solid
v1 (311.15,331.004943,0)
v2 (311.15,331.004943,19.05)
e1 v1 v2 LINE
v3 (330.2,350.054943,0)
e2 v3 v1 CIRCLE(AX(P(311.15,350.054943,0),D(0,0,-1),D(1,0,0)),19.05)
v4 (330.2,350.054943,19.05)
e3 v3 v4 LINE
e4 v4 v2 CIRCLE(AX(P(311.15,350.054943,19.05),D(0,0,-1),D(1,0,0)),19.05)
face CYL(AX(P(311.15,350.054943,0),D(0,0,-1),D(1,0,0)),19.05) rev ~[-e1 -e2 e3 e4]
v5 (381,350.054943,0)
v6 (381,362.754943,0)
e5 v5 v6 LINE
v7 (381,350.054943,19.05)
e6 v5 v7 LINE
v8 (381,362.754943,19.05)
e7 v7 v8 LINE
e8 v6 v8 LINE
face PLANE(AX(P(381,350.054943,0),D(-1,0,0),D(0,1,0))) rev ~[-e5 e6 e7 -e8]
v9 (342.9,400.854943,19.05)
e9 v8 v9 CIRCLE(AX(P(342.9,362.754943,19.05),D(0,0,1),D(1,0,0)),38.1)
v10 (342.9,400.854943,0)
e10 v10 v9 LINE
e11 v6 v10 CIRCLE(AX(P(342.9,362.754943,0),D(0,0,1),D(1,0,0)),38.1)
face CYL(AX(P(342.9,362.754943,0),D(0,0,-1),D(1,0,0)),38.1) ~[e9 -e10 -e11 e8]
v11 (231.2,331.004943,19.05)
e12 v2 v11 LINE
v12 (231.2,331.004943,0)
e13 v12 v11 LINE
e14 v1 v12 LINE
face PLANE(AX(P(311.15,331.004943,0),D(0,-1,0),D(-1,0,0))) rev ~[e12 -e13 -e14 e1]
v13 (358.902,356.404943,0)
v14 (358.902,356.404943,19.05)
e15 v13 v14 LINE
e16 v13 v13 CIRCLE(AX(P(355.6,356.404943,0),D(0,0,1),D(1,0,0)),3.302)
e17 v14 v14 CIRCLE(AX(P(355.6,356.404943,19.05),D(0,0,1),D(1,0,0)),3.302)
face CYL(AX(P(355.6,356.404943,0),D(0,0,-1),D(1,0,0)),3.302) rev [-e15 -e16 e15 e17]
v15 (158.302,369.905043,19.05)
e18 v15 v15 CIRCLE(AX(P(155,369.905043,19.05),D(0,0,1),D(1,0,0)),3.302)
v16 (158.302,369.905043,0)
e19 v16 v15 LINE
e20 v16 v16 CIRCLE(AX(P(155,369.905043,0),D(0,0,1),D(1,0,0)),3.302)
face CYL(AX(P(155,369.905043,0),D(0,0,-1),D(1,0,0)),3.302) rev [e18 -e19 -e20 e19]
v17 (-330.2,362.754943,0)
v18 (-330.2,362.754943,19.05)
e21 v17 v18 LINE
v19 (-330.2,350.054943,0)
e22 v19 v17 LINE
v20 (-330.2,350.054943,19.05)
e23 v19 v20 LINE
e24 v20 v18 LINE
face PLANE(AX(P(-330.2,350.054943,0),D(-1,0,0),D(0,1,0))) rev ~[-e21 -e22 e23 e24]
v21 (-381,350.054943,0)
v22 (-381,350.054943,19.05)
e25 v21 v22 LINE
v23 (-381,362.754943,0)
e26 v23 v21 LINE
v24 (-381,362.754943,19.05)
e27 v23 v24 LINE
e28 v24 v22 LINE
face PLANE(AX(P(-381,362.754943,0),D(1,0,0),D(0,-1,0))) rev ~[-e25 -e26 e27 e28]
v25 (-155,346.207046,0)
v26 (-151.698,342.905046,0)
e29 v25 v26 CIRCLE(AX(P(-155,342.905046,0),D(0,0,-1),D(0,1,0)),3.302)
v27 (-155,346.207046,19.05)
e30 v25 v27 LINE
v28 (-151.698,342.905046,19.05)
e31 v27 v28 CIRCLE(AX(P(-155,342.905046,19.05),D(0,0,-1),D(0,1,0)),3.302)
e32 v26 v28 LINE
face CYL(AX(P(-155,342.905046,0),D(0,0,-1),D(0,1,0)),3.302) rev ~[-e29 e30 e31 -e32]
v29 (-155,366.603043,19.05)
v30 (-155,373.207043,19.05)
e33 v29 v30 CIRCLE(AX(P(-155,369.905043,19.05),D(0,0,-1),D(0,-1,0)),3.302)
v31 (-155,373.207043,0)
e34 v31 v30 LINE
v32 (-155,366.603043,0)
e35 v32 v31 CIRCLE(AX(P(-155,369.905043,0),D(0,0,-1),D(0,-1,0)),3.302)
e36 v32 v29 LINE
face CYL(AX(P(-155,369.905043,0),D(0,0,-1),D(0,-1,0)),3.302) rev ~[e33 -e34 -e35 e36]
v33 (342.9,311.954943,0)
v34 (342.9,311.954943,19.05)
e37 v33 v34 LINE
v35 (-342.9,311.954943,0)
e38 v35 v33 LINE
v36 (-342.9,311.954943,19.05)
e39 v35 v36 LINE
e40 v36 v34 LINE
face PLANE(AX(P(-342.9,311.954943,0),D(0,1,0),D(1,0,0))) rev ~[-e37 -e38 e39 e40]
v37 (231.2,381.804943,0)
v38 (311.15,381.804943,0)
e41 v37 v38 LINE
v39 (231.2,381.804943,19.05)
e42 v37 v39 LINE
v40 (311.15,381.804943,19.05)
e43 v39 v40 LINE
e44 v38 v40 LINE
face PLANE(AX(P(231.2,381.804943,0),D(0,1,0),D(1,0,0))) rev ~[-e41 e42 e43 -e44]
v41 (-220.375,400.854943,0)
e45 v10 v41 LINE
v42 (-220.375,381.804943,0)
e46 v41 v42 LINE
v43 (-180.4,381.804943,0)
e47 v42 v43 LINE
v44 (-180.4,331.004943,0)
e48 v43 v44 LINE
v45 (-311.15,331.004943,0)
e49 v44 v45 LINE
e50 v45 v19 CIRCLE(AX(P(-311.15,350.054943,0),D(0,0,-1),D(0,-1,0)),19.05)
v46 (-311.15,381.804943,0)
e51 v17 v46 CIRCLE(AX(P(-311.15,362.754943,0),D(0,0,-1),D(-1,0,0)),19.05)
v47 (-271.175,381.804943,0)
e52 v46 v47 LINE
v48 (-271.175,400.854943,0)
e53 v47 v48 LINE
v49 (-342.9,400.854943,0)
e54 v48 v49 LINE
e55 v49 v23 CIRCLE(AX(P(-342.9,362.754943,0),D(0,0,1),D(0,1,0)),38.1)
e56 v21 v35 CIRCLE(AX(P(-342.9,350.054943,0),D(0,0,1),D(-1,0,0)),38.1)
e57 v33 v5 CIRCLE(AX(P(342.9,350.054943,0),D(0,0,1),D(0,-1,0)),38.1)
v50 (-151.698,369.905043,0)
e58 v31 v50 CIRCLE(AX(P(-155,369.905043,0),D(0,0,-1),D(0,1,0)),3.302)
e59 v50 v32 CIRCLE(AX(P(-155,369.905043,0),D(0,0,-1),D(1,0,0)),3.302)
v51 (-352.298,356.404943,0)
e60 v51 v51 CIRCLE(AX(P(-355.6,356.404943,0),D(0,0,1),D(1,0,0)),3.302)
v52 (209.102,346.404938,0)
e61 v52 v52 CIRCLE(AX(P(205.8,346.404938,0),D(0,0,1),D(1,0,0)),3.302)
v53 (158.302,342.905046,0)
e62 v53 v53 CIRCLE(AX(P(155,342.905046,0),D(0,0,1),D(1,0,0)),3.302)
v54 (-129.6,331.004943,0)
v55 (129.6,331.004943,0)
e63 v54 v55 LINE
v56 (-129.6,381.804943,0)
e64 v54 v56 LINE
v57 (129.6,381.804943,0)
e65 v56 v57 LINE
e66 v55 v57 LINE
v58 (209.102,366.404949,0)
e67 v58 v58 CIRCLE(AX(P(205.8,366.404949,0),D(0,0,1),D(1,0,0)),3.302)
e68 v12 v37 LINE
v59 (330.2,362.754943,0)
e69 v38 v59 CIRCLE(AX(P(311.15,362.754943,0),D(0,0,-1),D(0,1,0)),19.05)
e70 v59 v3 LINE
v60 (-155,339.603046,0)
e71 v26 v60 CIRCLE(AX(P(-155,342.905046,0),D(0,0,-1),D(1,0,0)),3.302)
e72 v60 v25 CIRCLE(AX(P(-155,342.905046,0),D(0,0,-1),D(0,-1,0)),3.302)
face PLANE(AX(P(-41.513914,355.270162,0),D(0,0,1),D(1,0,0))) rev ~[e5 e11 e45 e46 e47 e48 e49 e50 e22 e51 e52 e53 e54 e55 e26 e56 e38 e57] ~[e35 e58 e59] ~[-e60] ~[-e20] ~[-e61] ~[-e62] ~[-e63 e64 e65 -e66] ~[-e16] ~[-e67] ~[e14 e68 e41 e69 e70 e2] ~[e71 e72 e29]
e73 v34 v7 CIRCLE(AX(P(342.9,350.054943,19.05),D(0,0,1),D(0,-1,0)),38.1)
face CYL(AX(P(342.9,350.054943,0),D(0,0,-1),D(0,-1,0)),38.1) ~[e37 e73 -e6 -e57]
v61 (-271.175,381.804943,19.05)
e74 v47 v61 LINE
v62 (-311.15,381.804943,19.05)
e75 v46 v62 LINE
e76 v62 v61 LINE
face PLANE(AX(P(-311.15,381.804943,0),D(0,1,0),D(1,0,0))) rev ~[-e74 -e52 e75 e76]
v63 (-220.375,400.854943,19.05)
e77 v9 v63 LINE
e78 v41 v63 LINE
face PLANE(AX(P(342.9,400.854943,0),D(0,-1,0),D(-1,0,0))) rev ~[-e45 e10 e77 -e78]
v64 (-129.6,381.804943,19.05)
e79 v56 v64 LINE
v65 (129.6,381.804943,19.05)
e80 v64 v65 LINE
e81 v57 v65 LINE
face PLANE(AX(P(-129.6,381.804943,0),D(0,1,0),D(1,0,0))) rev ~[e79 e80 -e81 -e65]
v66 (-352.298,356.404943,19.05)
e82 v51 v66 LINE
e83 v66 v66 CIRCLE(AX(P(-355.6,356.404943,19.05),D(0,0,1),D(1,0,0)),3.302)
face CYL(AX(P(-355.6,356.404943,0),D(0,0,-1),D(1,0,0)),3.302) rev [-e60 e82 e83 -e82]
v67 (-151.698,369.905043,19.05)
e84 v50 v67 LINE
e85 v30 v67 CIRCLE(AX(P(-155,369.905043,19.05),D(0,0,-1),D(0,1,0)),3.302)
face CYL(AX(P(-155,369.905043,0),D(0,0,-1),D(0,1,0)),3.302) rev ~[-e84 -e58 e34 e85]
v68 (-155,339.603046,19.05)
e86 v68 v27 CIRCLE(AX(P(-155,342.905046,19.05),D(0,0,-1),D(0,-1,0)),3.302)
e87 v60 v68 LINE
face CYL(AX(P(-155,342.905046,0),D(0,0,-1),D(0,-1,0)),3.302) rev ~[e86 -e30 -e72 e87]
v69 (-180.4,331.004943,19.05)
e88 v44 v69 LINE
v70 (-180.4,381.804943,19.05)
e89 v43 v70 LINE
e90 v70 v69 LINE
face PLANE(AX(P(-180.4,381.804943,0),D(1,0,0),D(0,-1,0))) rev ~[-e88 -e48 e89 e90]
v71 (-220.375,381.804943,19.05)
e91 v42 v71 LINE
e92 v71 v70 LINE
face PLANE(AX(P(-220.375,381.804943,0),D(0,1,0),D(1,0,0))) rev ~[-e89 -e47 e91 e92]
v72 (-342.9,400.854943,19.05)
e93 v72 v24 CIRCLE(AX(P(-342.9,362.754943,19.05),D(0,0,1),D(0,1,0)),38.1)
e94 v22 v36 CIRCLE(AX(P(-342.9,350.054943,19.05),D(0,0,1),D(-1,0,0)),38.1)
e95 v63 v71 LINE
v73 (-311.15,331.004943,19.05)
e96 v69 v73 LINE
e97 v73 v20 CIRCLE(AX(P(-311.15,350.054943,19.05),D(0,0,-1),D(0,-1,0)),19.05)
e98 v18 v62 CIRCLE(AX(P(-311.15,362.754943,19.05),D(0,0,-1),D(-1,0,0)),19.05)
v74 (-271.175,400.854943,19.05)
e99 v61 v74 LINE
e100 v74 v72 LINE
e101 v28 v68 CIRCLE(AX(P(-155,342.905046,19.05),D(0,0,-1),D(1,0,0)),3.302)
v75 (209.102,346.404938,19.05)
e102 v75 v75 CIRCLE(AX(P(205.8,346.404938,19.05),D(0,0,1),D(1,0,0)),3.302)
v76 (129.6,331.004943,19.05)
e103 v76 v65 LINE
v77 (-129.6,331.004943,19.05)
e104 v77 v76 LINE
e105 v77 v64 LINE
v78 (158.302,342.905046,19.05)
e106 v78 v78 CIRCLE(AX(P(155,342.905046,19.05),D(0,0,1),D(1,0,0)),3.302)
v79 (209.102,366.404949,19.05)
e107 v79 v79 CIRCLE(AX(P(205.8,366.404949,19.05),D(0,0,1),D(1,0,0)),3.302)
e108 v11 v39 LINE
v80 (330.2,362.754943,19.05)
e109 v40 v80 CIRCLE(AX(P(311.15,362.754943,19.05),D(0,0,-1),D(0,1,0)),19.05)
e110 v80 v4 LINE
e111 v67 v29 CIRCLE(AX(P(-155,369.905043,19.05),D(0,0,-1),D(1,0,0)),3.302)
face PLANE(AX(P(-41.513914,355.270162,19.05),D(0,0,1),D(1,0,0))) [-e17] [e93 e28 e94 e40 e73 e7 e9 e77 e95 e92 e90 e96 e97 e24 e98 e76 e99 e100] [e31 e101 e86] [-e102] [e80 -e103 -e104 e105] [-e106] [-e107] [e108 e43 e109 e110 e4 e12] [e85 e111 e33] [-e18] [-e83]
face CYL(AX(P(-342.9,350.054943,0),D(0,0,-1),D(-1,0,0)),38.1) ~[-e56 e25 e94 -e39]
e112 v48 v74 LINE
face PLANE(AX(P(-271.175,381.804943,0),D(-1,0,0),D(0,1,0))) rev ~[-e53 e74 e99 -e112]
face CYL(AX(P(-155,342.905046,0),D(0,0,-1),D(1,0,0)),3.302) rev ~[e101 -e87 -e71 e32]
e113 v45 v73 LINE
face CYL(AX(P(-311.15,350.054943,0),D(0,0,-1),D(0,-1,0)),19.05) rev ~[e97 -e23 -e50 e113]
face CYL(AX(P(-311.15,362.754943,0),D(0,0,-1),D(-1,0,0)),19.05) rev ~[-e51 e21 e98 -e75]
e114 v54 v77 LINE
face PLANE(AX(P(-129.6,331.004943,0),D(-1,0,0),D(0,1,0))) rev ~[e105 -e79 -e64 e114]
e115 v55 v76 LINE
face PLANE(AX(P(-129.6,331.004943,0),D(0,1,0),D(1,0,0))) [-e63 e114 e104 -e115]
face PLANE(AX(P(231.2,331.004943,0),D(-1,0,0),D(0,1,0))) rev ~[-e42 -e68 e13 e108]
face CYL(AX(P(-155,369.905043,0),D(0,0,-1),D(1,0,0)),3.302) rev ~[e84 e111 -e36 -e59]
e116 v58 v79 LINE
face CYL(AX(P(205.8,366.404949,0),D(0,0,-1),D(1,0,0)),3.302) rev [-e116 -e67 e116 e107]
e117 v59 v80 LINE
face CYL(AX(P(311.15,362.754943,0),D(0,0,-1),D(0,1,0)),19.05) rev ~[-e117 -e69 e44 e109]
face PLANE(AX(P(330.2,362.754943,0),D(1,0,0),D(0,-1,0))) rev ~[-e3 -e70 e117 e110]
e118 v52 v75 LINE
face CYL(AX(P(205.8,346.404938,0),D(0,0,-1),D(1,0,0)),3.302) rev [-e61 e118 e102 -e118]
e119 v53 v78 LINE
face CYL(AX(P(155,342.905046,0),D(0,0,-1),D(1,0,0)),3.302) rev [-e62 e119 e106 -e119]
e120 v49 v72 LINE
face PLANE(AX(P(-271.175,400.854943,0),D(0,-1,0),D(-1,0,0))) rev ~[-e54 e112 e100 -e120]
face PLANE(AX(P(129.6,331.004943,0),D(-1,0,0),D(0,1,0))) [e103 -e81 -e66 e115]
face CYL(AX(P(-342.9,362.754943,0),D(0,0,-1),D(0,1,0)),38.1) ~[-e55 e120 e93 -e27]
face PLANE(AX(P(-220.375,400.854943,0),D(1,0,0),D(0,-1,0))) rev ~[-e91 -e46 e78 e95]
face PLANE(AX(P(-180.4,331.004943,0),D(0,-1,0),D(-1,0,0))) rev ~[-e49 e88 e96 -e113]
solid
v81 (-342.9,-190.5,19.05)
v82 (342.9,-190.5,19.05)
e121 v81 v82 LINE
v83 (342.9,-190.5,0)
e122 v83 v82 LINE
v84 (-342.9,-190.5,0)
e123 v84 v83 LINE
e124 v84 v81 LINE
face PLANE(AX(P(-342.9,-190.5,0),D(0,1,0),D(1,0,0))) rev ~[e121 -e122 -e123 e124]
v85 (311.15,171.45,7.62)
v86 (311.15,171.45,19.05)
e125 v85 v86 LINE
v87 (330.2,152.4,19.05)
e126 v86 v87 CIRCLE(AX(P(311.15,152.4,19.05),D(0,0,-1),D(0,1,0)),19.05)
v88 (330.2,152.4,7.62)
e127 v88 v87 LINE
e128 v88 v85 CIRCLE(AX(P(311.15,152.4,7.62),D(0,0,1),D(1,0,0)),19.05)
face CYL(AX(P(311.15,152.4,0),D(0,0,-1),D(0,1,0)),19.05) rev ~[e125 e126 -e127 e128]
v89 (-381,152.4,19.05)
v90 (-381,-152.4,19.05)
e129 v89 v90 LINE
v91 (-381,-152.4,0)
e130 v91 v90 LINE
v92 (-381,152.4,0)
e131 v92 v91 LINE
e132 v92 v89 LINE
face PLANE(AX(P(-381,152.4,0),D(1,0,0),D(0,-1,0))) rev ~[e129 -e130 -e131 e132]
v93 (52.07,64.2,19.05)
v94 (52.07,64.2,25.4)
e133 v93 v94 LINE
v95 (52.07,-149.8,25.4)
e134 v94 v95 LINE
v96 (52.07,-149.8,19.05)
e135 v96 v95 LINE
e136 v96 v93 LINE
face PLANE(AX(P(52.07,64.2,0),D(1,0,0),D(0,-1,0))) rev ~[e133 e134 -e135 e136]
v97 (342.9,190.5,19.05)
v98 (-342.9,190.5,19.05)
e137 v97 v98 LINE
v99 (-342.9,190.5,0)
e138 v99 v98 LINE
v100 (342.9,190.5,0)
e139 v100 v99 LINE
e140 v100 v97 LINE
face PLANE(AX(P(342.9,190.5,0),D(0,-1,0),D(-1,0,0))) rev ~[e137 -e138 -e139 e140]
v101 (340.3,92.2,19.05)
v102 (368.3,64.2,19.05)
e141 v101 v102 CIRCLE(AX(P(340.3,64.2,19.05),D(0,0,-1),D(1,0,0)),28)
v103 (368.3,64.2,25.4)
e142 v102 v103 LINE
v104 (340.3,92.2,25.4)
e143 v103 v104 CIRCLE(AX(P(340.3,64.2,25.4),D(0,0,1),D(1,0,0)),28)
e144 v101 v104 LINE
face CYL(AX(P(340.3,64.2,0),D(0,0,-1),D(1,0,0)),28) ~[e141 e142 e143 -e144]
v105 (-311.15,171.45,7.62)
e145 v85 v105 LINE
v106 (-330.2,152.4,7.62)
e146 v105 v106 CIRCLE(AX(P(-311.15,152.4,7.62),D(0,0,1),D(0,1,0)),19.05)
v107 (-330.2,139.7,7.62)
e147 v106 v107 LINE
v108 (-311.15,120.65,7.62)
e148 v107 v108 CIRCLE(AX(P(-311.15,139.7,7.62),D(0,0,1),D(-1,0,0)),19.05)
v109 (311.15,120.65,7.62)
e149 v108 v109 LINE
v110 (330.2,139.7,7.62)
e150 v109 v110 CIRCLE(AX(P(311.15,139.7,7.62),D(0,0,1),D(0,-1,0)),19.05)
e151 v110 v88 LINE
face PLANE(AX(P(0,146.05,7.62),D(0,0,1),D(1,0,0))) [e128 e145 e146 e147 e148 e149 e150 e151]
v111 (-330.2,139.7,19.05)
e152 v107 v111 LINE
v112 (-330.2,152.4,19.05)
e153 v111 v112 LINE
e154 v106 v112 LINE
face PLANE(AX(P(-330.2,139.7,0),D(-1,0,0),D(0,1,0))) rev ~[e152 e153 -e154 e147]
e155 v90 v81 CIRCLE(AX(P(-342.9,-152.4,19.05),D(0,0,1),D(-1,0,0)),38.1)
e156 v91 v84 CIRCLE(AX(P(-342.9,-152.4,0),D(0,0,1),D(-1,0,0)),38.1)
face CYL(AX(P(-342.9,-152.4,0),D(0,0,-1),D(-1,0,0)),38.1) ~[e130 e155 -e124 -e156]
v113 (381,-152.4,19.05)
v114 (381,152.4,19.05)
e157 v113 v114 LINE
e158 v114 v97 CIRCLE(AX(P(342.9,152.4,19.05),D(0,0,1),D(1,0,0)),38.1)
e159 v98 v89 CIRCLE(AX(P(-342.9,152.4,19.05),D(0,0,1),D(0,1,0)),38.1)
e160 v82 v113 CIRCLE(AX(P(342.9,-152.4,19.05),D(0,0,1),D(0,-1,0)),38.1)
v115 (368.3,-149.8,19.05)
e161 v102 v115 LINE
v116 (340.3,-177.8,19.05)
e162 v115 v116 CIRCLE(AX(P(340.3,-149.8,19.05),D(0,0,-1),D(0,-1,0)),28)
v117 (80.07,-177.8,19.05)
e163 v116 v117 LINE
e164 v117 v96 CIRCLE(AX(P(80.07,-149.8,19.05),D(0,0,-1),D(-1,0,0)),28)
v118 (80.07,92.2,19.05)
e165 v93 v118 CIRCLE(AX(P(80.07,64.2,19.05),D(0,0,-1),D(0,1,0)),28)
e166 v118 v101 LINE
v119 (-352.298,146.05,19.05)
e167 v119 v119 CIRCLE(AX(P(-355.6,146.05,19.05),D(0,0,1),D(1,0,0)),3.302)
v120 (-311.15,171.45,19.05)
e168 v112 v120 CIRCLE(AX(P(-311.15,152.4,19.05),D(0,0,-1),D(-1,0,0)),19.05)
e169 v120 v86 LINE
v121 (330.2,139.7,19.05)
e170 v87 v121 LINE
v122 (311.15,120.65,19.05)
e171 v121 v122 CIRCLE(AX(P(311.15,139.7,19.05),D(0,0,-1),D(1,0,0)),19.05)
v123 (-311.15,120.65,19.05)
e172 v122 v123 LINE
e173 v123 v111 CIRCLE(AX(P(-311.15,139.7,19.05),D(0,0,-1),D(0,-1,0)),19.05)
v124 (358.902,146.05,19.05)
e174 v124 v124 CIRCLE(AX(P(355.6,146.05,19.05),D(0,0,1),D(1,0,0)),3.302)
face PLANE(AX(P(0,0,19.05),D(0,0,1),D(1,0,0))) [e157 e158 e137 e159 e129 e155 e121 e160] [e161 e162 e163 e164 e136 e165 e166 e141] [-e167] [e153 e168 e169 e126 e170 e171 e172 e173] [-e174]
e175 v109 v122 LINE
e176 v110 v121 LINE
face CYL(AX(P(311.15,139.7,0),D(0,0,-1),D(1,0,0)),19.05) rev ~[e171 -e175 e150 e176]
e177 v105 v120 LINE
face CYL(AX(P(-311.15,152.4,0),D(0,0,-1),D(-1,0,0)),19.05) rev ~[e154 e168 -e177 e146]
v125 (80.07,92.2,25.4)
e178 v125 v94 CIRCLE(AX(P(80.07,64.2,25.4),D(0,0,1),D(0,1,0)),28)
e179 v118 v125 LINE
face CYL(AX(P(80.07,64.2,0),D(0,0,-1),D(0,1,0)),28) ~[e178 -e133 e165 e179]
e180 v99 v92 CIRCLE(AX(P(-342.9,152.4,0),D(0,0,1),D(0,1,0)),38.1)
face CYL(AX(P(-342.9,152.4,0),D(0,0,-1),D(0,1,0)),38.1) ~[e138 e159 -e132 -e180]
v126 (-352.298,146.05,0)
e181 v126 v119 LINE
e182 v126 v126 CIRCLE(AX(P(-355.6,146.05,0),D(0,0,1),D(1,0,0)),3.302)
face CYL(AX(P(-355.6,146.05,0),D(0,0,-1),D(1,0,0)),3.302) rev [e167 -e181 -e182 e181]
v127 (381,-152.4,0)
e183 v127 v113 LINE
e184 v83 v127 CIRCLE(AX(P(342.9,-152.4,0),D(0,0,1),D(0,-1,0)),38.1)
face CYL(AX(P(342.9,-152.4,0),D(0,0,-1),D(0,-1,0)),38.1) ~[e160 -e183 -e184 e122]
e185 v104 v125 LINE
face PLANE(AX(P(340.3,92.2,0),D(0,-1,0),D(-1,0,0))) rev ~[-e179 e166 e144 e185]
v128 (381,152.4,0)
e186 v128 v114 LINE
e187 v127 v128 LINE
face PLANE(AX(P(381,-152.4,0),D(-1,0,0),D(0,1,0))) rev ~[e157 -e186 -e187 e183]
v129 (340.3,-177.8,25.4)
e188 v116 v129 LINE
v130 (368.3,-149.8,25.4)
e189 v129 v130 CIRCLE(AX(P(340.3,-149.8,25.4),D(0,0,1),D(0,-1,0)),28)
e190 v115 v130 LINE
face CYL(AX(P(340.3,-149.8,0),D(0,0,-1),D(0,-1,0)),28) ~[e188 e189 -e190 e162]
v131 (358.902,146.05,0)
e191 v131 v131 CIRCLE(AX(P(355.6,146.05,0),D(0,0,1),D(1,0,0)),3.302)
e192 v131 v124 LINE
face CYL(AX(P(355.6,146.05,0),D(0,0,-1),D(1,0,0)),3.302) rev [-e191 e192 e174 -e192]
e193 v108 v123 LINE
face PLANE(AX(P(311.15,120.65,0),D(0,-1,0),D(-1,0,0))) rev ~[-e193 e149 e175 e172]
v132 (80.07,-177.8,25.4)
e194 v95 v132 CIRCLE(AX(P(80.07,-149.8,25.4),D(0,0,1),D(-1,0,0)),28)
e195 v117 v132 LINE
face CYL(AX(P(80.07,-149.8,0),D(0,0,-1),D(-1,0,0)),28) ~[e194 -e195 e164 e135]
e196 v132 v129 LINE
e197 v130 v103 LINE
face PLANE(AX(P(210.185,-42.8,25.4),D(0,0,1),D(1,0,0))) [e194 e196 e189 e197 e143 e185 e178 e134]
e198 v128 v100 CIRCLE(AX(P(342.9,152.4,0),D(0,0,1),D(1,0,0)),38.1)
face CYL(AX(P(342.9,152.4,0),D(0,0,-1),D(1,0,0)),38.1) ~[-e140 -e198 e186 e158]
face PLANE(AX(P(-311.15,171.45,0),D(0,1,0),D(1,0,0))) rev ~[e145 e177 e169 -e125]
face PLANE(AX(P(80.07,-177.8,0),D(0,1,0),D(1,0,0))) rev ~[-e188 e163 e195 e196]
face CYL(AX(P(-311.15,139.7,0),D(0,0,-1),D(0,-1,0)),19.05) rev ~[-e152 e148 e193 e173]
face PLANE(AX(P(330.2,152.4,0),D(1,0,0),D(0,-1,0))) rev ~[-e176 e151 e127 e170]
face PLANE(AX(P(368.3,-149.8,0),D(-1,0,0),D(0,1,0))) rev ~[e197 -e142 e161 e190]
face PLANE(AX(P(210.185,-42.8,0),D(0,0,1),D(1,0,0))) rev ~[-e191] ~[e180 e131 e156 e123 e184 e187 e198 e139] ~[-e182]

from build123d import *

# Parameters (mm, degrees)
F0_R     = 3.302
F0_W     = 259.2
F0_H     = 50.8
F1_DEPTH = 19.05
F2_DEPTH = 19.05
F3_DEPTH = 7.62
F4_DEPTH = 25.4


# Not quite as in the source:
# - a feature names something its author has since deleted; it is built from what else it names


with BuildPart() as f1:
    # F0 (on Top) → F1 (new body)
    with BuildSketch(Plane.XY):
        with BuildLine():
            ThreePointArc((-381, 350.0549432278), (-369.8407683632, 323.1141748646), (-342.9, 311.9549432278))
            Line((-342.9, 311.9549432278), (342.9, 311.9549432278))
            ThreePointArc((342.9, 311.9549432278), (369.8407683632, 323.1141748646), (381, 350.0549432278))
            Line((381, 350.0549432278), (381, 362.7549432278))
            ThreePointArc((381, 362.7549432278), (369.8407683632, 389.695711591), (342.9, 400.8549432278))
            Line((342.9, 400.8549432278), (-220.375, 400.8549432278))
            Line((-220.375, 400.8549432278), (-220.375, 381.8049432278))
            Line((-220.375, 381.8049432278), (-180.4, 381.8049432278))
            Line((-180.4, 381.8049432278), (-180.4, 331.0049432278))
            Line((-180.4, 331.0049432278), (-311.15, 331.0049432278))
            ThreePointArc((-311.15, 331.0049432278), (-324.6203841816, 336.5845590462), (-330.2, 350.0549432278))
            Line((-330.2, 350.0549432278), (-330.2, 362.7549432278))
            ThreePointArc((-330.2, 362.7549432278), (-324.6203841816, 376.2253274094), (-311.15, 381.8049432278))
            Line((-311.15, 381.8049432278), (-271.175, 381.8049432278))
            Line((-271.175, 381.8049432278), (-271.175, 400.8549432278))
            Line((-271.175, 400.8549432278), (-342.9, 400.8549432278))
            ThreePointArc((-342.9, 400.8549432278), (-369.8407683632, 389.695711591), (-381, 362.7549432278))
            Line((-381, 362.7549432278), (-381, 350.0549432278))
        make_face()
        with Locations((-355.6, 356.4049432278)):
            Circle(F0_R, mode=Mode.SUBTRACT)
        with BuildLine():
            ThreePointArc((-155, 339.6030464278), (-158.302, 342.9050464278), (-155, 346.2070464278))
            ThreePointArc((-155, 346.2070464278), (-152.6651334085, 345.2399130192), (-151.698, 342.9050464278))
            ThreePointArc((-151.698, 342.9050464278), (-152.6651334085, 340.5701798363), (-155, 339.6030464278))
        make_face(mode=Mode.SUBTRACT)
        with BuildLine():
            ThreePointArc((-155, 366.6030432278), (-158.302, 369.9050432278), (-155, 373.2070432278))
            ThreePointArc((-155, 373.2070432278), (-152.6651334085, 372.2399098192), (-151.698, 369.9050432278))
            ThreePointArc((-151.698, 369.9050432278), (-152.6651334085, 367.5701766363), (-155, 366.6030432278))
        make_face(mode=Mode.SUBTRACT)
        with Locations((0, 356.4049432278)):
            Rectangle(F0_W, F0_H, mode=Mode.SUBTRACT)
        with Locations((155, 342.9050464278)):
            Circle(F0_R, mode=Mode.SUBTRACT)
        with Locations((155, 369.9050432278)):
            Circle(F0_R, mode=Mode.SUBTRACT)
        with Locations((205.8, 346.4049378278)):
            Circle(F0_R, mode=Mode.SUBTRACT)
        with Locations((205.8, 366.4049486278)):
            Circle(F0_R, mode=Mode.SUBTRACT)
        with BuildLine():
            Line((231.2, 331.0049432278), (231.2, 381.8049432278))
            Line((231.2, 381.8049432278), (311.15, 381.8049432278))
            ThreePointArc((311.15, 381.8049432278), (324.6203841816, 376.2253274094), (330.2, 362.7549432278))
            Line((330.2, 362.7549432278), (330.2, 350.0549432278))
            ThreePointArc((330.2, 350.0549432278), (324.6203841816, 336.5845590462), (311.15, 331.0049432278))
            Line((311.15, 331.0049432278), (231.2, 331.0049432278))
        make_face(mode=Mode.SUBTRACT)
        with Locations((355.6, 356.4049432278)):
            Circle(F0_R, mode=Mode.SUBTRACT)
    extrude(amount=F1_DEPTH)


with BuildPart() as f2:
    # F0 (on Top) → F2 (new body)
    with BuildSketch(Plane.XY):
        with BuildLine():
            Line((-342.9, -190.5), (342.9, -190.5))
            ThreePointArc((342.9, -190.5), (369.8407683632, -179.3407683632), (381, -152.4))
            Line((381, -152.4), (381, 152.4))
            ThreePointArc((381, 152.4), (369.8407683632, 179.3407683632), (342.9, 190.5))
            Line((342.9, 190.5), (-342.9, 190.5))
            ThreePointArc((-342.9, 190.5), (-369.8407683632, 179.3407683632), (-381, 152.4))
            Line((-381, 152.4), (-381, -152.4))
            ThreePointArc((-381, -152.4), (-369.8407683632, -179.3407683632), (-342.9, -190.5))
        make_face()
        with BuildLine():
            ThreePointArc((368.3, -149.8), (360.0989898732, -169.5989898732), (340.3, -177.8))
            Line((340.3, -177.8), (80.07, -177.8))
            ThreePointArc((80.07, -177.8), (60.2710101268, -169.5989898732), (52.07, -149.8))
            Line((52.07, -149.8), (52.07, 64.2))
            ThreePointArc((52.07, 64.2), (60.2710101268, 83.9989898732), (80.07, 92.2))
            Line((80.07, 92.2), (340.3, 92.2))
            ThreePointArc((340.3, 92.2), (360.0989898732, 83.9989898732), (368.3, 64.2))
            Line((368.3, 64.2), (368.3, -149.8))
        make_face(mode=Mode.SUBTRACT)
        with Locations((-355.6, 146.05)):
            Circle(F0_R, mode=Mode.SUBTRACT)
        with BuildLine():
            ThreePointArc((-330.2, 152.4), (-324.6203841816, 165.8703841816), (-311.15, 171.45))
            Line((-311.15, 171.45), (311.15, 171.45))
            ThreePointArc((311.15, 171.45), (324.6203841816, 165.8703841816), (330.2, 152.4))
            Line((330.2, 152.4), (330.2, 139.7))
            ThreePointArc((330.2, 139.7), (324.6203841816, 126.2296158184), (311.15, 120.65))
            Line((311.15, 120.65), (-311.15, 120.65))
            ThreePointArc((-311.15, 120.65), (-324.6203841816, 126.2296158184), (-330.2, 139.7))
            Line((-330.2, 139.7), (-330.2, 152.4))
        make_face(mode=Mode.SUBTRACT)
        with Locations((355.6, 146.05)):
            Circle(F0_R, mode=Mode.SUBTRACT)
        with BuildLine():
            Line((80.07, -177.8), (340.3, -177.8))
            ThreePointArc((340.3, -177.8), (360.0989898732, -169.5989898732), (368.3, -149.8))
            Line((368.3, -149.8), (368.3, 64.2))
            ThreePointArc((368.3, 64.2), (360.0989898732, 83.9989898732), (340.3, 92.2))
            Line((340.3, 92.2), (80.07, 92.2))
            ThreePointArc((80.07, 92.2), (60.2710101268, 83.9989898732), (52.07, 64.2))
            Line((52.07, 64.2), (52.07, -149.8))
            ThreePointArc((52.07, -149.8), (60.2710101268, -169.5989898732), (80.07, -177.8))
        make_face()
    extrude(amount=F2_DEPTH)

    # F0 (on Top) → F3 (join)
    with BuildSketch(Plane.XY):
        with BuildLine():
            Line((311.15, 171.45), (-311.15, 171.45))
            ThreePointArc((-311.15, 171.45), (-324.6203841816, 165.8703841816), (-330.2, 152.4))
            Line((-330.2, 152.4), (-330.2, 139.7))
            ThreePointArc((-330.2, 139.7), (-324.6203841816, 126.2296158184), (-311.15, 120.65))
            Line((-311.15, 120.65), (311.15, 120.65))
            ThreePointArc((311.15, 120.65), (324.6203841816, 126.2296158184), (330.2, 139.7))
            Line((330.2, 139.7), (330.2, 152.4))
            ThreePointArc((330.2, 152.4), (324.6203841816, 165.8703841816), (311.15, 171.45))
        make_face()
    extrude(amount=F3_DEPTH)

    # F0 (on Top) → F4 (join)
    with BuildSketch(Plane.XY):
        with BuildLine():
            Line((80.07, -177.8), (340.3, -177.8))
            ThreePointArc((340.3, -177.8), (360.0989898732, -169.5989898732), (368.3, -149.8))
            Line((368.3, -149.8), (368.3, 64.2))
            ThreePointArc((368.3, 64.2), (360.0989898732, 83.9989898732), (340.3, 92.2))
            Line((340.3, 92.2), (80.07, 92.2))
            ThreePointArc((80.07, 92.2), (60.2710101268, 83.9989898732), (52.07, 64.2))
            Line((52.07, 64.2), (52.07, -149.8))
            ThreePointArc((52.07, -149.8), (60.2710101268, -169.5989898732), (80.07, -177.8))
        make_face()
    extrude(amount=F4_DEPTH)


solid = Compound([f1.part, f2.part])
